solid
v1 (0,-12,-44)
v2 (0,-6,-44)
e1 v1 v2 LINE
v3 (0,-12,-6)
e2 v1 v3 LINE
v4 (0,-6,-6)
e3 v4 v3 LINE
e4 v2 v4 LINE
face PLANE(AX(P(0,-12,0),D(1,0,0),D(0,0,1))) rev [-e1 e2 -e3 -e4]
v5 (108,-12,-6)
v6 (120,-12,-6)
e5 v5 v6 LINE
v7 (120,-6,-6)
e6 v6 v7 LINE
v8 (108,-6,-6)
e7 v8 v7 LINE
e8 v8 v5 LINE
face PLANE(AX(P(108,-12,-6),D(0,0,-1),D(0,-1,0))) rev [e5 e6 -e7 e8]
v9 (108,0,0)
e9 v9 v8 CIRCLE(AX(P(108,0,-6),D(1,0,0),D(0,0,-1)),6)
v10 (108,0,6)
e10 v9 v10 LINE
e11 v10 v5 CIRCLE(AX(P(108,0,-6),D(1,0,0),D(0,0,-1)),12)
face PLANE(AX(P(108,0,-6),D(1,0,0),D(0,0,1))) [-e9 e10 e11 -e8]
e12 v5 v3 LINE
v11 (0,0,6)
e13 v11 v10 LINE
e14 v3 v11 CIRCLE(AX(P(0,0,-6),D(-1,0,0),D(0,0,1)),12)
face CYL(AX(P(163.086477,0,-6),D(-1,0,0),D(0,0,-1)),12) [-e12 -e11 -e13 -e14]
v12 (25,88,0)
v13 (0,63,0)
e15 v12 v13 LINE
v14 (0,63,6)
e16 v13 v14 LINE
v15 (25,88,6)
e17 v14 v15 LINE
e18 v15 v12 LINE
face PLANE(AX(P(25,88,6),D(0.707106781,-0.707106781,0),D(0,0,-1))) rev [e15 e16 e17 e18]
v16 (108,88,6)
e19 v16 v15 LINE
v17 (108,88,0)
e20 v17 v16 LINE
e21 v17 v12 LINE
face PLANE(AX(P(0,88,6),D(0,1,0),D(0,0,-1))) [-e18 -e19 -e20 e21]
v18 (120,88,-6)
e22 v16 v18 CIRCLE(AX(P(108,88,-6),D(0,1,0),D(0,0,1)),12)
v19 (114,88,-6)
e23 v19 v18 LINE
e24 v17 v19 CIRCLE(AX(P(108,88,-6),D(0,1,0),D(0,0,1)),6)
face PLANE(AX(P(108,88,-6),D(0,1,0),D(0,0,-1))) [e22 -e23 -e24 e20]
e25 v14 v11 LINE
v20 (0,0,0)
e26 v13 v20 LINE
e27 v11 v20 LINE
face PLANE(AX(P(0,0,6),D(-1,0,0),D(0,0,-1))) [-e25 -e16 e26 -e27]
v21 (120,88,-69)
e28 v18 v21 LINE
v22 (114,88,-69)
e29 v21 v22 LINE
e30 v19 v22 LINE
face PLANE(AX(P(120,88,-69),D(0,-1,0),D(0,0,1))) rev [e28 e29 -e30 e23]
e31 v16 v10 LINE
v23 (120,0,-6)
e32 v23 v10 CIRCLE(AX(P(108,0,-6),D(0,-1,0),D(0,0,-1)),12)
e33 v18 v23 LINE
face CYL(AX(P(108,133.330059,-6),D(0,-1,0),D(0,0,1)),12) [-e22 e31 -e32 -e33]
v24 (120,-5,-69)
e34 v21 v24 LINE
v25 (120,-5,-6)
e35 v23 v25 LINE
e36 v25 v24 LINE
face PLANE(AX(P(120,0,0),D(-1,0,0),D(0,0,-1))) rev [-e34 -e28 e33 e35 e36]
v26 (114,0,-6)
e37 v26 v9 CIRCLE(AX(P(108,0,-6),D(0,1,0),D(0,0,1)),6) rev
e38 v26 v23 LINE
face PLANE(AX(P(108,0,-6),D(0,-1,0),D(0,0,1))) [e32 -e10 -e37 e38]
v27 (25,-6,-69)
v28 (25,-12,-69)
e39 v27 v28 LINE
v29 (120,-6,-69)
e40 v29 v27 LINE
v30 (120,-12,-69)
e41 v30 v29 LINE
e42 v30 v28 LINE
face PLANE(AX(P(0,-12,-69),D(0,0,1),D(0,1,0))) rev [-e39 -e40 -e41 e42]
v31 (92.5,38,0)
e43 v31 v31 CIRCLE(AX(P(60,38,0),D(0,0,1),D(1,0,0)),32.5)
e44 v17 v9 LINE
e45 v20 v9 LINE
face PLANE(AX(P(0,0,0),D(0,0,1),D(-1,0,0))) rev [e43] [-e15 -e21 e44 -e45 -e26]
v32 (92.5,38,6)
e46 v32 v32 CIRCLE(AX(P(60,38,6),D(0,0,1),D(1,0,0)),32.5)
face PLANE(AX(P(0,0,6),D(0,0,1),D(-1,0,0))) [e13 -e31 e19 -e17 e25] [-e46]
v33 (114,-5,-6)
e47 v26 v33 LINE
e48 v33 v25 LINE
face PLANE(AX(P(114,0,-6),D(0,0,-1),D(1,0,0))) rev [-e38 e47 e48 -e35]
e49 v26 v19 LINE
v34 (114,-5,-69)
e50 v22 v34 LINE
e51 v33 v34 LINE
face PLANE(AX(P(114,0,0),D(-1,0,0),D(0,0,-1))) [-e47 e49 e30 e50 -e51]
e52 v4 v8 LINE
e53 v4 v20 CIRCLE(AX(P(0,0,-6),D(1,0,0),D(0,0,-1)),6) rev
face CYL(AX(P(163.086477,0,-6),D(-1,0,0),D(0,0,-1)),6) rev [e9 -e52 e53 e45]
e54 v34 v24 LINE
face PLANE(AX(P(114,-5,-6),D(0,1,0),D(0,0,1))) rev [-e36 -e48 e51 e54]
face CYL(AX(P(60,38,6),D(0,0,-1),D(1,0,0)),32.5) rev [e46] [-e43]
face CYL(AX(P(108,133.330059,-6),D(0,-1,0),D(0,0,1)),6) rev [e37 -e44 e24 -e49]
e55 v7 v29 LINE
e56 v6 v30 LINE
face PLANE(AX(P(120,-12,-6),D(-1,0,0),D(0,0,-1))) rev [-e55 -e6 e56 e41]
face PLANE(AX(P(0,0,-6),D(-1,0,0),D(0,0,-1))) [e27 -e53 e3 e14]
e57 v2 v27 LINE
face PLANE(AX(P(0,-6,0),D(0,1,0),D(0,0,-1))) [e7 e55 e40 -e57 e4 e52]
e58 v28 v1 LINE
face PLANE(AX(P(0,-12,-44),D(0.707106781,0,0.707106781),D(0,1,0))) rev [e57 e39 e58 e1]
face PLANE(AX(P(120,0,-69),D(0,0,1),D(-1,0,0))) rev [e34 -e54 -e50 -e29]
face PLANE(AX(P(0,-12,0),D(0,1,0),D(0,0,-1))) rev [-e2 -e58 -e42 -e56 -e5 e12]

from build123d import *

# Parameters (mm, degrees)
SKETCH_1_W                       = 120
SKETCH_1_H                       = 88
SKETCH_1_R                       = 32.5
SM_BASE_FLANGE_1_DEPTH           = 6
SM_EDGE_FLANGE_5_STRIP_W         = 36
SM_EDGE_FLANGE_5_STRIP_H         = 6
SM_EDGE_FLANGE_5_STRIP_CUT_DEPTH = 88
SM_EDGE_FLANGE_5_DEPTH           = 88
SM_EDGE_FLANGE_7_DEPTH           = 108
OTHER_START                      = -12
OTHER_1_OUTLINE_W                = 12
OTHER_1_OUTLINE_H                = 63
OTHER_1_DEPTH                    = 6
OTHER_START_2                    = -5
OTHER_1_2_OUTLINE_W              = 6
OTHER_1_2_OUTLINE_H              = 63
OTHER_1_2_DEPTH                  = 5
CHAMFER_1_SIZE                   = 25
MOVE_START                       = -12
MOVE_BODY_1_DEPTH                = 100
MOVE_START_2                     = -5
MOVE_BODY_1_2_OUTLINE_W          = 108
MOVE_BODY_1_2_OUTLINE_H          = 12
MOVE_BODY_1_2_OUTLINE_W_2        = 6
MOVE_BODY_1_2_OUTLINE_H_2        = 63
MOVE_BODY_1_2_DEPTH              = 93
MOVE_BODY_1_3_DEPTH              = 6
MOVE_BODY_1_4_DEPTH              = 88
MOVE_START_3                     = -6
MOVE_BODY_1_5_OUTLINE_W          = 108
MOVE_BODY_1_5_OUTLINE_H          = 12
MOVE_BODY_1_5_DEPTH              = 1
MOVE_BODY_1_6_OUTLINE_R          = 32.5
MOVE_BODY_1_6_DEPTH              = 12
MOVE_BODY_1_7_DEPTH              = 108


with BuildPart() as part:
    # Базовая кромка1: sheet metal written as solids
    # Sketch 1 → Базовая кромка1 (new body)
    with BuildSketch(Plane.XY):
        with Locations((60, 44)):
            Rectangle(SKETCH_1_W, SKETCH_1_H)
        with Locations((60, 38)):
            Circle(SKETCH_1_R, mode=Mode.SUBTRACT)
    extrude(amount=-SM_BASE_FLANGE_1_DEPTH)

    # Ребро-кромка5: sheet metal written as solids
    # Ребро-кромка5 strip (on a plane across the edge) → Ребро-кромка5 strip cut (cut)
    with BuildSketch(Plane(origin=(120, 0, 0), x_dir=(-1, 0, 0), z_dir=(0, 1, 0))):
        with Locations((-6, -3)):
            Rectangle(SM_EDGE_FLANGE_5_STRIP_W, SM_EDGE_FLANGE_5_STRIP_H)
    extrude(amount=SM_EDGE_FLANGE_5_STRIP_CUT_DEPTH, mode=Mode.SUBTRACT)

    # Ребро-кромка5 section (on a plane across the edge) → Ребро-кромка5 (add)
    with BuildSketch(Plane(origin=(120, 0, 0), x_dir=(-1, 0, 0), z_dir=(0, 1, 0))):
        with BuildLine():
            Line((0, 6), (0, 69))
            Line((0, 69), (6, 69))
            Line((6, 69), (6, 6))
            ThreePointArc((6, 6), (7.757359313, 1.757359313), (12, 0))
            Line((12, 0), (12, -6))
            ThreePointArc((12, -6), (3.514718626, -2.485281374), (0, 6))
        make_face()
    extrude(amount=SM_EDGE_FLANGE_5_DEPTH)

    # Ребро-кромка7: sheet metal written as solids
    # Ребро-кромка7 section (on a plane across the edge) → Ребро-кромка7 (add)
    with BuildSketch(Plane(origin=(0, -6, 0), x_dir=(0, 1, 0), z_dir=(1, 0, 0))):
        with BuildLine():
            Line((-6, 6), (-6, 69))
            Line((-6, 69), (0, 69))
            Line((0, 69), (0, 6))
            ThreePointArc((0, 6), (1.757359313, 1.757359313), (6, 0))
            Line((6, 0), (6, -6))
            ThreePointArc((6, -6), (-2.485281374, -2.485281374), (-6, 6))
        make_face()
    extrude(amount=SM_EDGE_FLANGE_7_DEPTH)

    # Other 1: read off the stored shape, not the designer's step
    # Other 1 outline → Other 1 (add)
    with BuildSketch(Plane(origin=(0, 0, 0), x_dir=(1, 0, 0), z_dir=(0, 1, 0)).offset(OTHER_START)):
        with Locations((114, -37.5)):
            Rectangle(OTHER_1_OUTLINE_W, OTHER_1_OUTLINE_H)
    extrude(amount=OTHER_1_DEPTH)

    # Other 1 2 outline → Other 1 2 (add)
    with BuildSketch(Plane(origin=(0, 0, 0), x_dir=(1, 0, 0), z_dir=(0, 1, 0)).offset(OTHER_START_2)):
        with Locations((117, -37.5)):
            Rectangle(OTHER_1_2_OUTLINE_W, OTHER_1_2_OUTLINE_H)
    extrude(amount=OTHER_1_2_DEPTH)

    # Фаска1
    chamfer_1_edges = [part.edges().sort_by_distance(p)[0] for p in [
        (0, -9, 69),
        (0, 88, -3),
    ]]
    chamfer(chamfer_1_edges, length=CHAMFER_1_SIZE)

    # Move Body 1: read off the stored shape, not the designer's step
    # Move Body 1 outline → Move Body 1 (cut)
    with BuildSketch(Plane(origin=(0, 0, 0), x_dir=(1, 0, 0), z_dir=(0, 1, 0)).offset(MOVE_START)):
        with BuildLine():
            Line((0, -6), (0, -44))
            Line((0, -44), (25, -69))
            Line((25, -69), (120, -69))
            Line((120, -69), (120, -6))
            ThreePointArc((120, -6), (119.591109915, -2.894171459), (118.392304845, 0))
            ThreePointArc((118.392304845, 0), (116.40755123, -2.562305899), (113.809475019, -4.5))
            ThreePointArc((113.809475019, -4.5), (113.952178178, -5.243974245), (114, -6))
            Line((114, -6), (0, -6))
        make_face()
        with BuildLine():
            Line((108, 6), (108, 0))
            ThreePointArc((108, 0), (111.674234614, 1.25658351), (113.809475019, 4.5))
            ThreePointArc((113.809475019, 4.5), (111, 5.618950038), (108, 6))
        make_face()
    extrude(amount=MOVE_BODY_1_DEPTH, mode=Mode.SUBTRACT)

    # Move Body 1 2 outline → Move Body 1 2 (add)
    with BuildSketch(Plane(origin=(0, 0, 0), x_dir=(1, 0, 0), z_dir=(0, 1, 0)).offset(MOVE_START_2)):
        with Locations((54, 0)):
            Rectangle(MOVE_BODY_1_2_OUTLINE_W, MOVE_BODY_1_2_OUTLINE_H)
        with Locations((117, 37.5)):
            Rectangle(MOVE_BODY_1_2_OUTLINE_W_2, MOVE_BODY_1_2_OUTLINE_H_2)
    extrude(amount=MOVE_BODY_1_2_DEPTH)

    # Move Body 1 3 outline → Move Body 1 3 (add)
    with BuildSketch(Plane(origin=(0, 0, 0), x_dir=(1, 0, 0), z_dir=(0, 1, 0)).offset(MOVE_START)):
        Polygon((0, -6), (108, -6), (108, 6), (120, 6), (120, 69), (25, 69), (0, 44), align=None)
    extrude(amount=MOVE_BODY_1_3_DEPTH)

    # Move Body 1 4 outline → Move Body 1 4 (add)
    with BuildSketch(Plane(origin=(0, 0, 0), x_dir=(1, 0, 0), z_dir=(0, 1, 0))):
        with BuildLine():
            Line((108, 0), (108, -6))
            ThreePointArc((108, -6), (111, -5.618950038), (113.809475019, -4.5))
            ThreePointArc((113.809475019, -4.5), (111.674234614, -1.25658351), (108, 0))
        make_face()
        with BuildLine():
            ThreePointArc((113.809475019, 4.5), (116.40755123, 2.562305899), (118.392304845, 0))
            ThreePointArc((118.392304845, 0), (119.591109915, 2.894171459), (120, 6))
            Line((120, 6), (114, 6))
            ThreePointArc((114, 6), (113.952178178, 5.243974245), (113.809475019, 4.5))
        make_face()
    extrude(amount=MOVE_BODY_1_4_DEPTH)

    # Move Body 1 5 outline → Move Body 1 5 (add)
    with BuildSketch(Plane(origin=(0, 0, 0), x_dir=(1, 0, 0), z_dir=(0, 1, 0)).offset(MOVE_START_3)):
        with Locations((54, 0)):
            Rectangle(MOVE_BODY_1_5_OUTLINE_W, MOVE_BODY_1_5_OUTLINE_H)
    extrude(amount=MOVE_BODY_1_5_DEPTH)

    # Move Body 1 6 outline → Move Body 1 6 (cut)
    with BuildSketch(Plane.XY.offset(MOVE_START_3)):
        with Locations((60, 38)):
            Circle(MOVE_BODY_1_6_OUTLINE_R)
        Polygon((0, 88), (0, 63), (25, 88), align=None)
    extrude(amount=MOVE_BODY_1_6_DEPTH, mode=Mode.SUBTRACT)

    # Move Body 1 7 outline → Move Body 1 7 (cut)
    with BuildSketch(Plane.YZ):
        with BuildLine():
            Line((88, -6), (88, 0))
            Line((88, 0), (0, 0))
            ThreePointArc((0, 0), (-4.242640687, -1.757359313), (-6, -6))
            Line((-6, -6), (88, -6))
        make_face()
        with BuildLine():
            ThreePointArc((-12, -6), (-8.485281374, 2.485281374), (0, 6))
            Line((0, 6), (-12, 6))
            Line((-12, 6), (-12, -6))
        make_face()
    extrude(amount=MOVE_BODY_1_7_DEPTH, mode=Mode.SUBTRACT)


solid = part.part
